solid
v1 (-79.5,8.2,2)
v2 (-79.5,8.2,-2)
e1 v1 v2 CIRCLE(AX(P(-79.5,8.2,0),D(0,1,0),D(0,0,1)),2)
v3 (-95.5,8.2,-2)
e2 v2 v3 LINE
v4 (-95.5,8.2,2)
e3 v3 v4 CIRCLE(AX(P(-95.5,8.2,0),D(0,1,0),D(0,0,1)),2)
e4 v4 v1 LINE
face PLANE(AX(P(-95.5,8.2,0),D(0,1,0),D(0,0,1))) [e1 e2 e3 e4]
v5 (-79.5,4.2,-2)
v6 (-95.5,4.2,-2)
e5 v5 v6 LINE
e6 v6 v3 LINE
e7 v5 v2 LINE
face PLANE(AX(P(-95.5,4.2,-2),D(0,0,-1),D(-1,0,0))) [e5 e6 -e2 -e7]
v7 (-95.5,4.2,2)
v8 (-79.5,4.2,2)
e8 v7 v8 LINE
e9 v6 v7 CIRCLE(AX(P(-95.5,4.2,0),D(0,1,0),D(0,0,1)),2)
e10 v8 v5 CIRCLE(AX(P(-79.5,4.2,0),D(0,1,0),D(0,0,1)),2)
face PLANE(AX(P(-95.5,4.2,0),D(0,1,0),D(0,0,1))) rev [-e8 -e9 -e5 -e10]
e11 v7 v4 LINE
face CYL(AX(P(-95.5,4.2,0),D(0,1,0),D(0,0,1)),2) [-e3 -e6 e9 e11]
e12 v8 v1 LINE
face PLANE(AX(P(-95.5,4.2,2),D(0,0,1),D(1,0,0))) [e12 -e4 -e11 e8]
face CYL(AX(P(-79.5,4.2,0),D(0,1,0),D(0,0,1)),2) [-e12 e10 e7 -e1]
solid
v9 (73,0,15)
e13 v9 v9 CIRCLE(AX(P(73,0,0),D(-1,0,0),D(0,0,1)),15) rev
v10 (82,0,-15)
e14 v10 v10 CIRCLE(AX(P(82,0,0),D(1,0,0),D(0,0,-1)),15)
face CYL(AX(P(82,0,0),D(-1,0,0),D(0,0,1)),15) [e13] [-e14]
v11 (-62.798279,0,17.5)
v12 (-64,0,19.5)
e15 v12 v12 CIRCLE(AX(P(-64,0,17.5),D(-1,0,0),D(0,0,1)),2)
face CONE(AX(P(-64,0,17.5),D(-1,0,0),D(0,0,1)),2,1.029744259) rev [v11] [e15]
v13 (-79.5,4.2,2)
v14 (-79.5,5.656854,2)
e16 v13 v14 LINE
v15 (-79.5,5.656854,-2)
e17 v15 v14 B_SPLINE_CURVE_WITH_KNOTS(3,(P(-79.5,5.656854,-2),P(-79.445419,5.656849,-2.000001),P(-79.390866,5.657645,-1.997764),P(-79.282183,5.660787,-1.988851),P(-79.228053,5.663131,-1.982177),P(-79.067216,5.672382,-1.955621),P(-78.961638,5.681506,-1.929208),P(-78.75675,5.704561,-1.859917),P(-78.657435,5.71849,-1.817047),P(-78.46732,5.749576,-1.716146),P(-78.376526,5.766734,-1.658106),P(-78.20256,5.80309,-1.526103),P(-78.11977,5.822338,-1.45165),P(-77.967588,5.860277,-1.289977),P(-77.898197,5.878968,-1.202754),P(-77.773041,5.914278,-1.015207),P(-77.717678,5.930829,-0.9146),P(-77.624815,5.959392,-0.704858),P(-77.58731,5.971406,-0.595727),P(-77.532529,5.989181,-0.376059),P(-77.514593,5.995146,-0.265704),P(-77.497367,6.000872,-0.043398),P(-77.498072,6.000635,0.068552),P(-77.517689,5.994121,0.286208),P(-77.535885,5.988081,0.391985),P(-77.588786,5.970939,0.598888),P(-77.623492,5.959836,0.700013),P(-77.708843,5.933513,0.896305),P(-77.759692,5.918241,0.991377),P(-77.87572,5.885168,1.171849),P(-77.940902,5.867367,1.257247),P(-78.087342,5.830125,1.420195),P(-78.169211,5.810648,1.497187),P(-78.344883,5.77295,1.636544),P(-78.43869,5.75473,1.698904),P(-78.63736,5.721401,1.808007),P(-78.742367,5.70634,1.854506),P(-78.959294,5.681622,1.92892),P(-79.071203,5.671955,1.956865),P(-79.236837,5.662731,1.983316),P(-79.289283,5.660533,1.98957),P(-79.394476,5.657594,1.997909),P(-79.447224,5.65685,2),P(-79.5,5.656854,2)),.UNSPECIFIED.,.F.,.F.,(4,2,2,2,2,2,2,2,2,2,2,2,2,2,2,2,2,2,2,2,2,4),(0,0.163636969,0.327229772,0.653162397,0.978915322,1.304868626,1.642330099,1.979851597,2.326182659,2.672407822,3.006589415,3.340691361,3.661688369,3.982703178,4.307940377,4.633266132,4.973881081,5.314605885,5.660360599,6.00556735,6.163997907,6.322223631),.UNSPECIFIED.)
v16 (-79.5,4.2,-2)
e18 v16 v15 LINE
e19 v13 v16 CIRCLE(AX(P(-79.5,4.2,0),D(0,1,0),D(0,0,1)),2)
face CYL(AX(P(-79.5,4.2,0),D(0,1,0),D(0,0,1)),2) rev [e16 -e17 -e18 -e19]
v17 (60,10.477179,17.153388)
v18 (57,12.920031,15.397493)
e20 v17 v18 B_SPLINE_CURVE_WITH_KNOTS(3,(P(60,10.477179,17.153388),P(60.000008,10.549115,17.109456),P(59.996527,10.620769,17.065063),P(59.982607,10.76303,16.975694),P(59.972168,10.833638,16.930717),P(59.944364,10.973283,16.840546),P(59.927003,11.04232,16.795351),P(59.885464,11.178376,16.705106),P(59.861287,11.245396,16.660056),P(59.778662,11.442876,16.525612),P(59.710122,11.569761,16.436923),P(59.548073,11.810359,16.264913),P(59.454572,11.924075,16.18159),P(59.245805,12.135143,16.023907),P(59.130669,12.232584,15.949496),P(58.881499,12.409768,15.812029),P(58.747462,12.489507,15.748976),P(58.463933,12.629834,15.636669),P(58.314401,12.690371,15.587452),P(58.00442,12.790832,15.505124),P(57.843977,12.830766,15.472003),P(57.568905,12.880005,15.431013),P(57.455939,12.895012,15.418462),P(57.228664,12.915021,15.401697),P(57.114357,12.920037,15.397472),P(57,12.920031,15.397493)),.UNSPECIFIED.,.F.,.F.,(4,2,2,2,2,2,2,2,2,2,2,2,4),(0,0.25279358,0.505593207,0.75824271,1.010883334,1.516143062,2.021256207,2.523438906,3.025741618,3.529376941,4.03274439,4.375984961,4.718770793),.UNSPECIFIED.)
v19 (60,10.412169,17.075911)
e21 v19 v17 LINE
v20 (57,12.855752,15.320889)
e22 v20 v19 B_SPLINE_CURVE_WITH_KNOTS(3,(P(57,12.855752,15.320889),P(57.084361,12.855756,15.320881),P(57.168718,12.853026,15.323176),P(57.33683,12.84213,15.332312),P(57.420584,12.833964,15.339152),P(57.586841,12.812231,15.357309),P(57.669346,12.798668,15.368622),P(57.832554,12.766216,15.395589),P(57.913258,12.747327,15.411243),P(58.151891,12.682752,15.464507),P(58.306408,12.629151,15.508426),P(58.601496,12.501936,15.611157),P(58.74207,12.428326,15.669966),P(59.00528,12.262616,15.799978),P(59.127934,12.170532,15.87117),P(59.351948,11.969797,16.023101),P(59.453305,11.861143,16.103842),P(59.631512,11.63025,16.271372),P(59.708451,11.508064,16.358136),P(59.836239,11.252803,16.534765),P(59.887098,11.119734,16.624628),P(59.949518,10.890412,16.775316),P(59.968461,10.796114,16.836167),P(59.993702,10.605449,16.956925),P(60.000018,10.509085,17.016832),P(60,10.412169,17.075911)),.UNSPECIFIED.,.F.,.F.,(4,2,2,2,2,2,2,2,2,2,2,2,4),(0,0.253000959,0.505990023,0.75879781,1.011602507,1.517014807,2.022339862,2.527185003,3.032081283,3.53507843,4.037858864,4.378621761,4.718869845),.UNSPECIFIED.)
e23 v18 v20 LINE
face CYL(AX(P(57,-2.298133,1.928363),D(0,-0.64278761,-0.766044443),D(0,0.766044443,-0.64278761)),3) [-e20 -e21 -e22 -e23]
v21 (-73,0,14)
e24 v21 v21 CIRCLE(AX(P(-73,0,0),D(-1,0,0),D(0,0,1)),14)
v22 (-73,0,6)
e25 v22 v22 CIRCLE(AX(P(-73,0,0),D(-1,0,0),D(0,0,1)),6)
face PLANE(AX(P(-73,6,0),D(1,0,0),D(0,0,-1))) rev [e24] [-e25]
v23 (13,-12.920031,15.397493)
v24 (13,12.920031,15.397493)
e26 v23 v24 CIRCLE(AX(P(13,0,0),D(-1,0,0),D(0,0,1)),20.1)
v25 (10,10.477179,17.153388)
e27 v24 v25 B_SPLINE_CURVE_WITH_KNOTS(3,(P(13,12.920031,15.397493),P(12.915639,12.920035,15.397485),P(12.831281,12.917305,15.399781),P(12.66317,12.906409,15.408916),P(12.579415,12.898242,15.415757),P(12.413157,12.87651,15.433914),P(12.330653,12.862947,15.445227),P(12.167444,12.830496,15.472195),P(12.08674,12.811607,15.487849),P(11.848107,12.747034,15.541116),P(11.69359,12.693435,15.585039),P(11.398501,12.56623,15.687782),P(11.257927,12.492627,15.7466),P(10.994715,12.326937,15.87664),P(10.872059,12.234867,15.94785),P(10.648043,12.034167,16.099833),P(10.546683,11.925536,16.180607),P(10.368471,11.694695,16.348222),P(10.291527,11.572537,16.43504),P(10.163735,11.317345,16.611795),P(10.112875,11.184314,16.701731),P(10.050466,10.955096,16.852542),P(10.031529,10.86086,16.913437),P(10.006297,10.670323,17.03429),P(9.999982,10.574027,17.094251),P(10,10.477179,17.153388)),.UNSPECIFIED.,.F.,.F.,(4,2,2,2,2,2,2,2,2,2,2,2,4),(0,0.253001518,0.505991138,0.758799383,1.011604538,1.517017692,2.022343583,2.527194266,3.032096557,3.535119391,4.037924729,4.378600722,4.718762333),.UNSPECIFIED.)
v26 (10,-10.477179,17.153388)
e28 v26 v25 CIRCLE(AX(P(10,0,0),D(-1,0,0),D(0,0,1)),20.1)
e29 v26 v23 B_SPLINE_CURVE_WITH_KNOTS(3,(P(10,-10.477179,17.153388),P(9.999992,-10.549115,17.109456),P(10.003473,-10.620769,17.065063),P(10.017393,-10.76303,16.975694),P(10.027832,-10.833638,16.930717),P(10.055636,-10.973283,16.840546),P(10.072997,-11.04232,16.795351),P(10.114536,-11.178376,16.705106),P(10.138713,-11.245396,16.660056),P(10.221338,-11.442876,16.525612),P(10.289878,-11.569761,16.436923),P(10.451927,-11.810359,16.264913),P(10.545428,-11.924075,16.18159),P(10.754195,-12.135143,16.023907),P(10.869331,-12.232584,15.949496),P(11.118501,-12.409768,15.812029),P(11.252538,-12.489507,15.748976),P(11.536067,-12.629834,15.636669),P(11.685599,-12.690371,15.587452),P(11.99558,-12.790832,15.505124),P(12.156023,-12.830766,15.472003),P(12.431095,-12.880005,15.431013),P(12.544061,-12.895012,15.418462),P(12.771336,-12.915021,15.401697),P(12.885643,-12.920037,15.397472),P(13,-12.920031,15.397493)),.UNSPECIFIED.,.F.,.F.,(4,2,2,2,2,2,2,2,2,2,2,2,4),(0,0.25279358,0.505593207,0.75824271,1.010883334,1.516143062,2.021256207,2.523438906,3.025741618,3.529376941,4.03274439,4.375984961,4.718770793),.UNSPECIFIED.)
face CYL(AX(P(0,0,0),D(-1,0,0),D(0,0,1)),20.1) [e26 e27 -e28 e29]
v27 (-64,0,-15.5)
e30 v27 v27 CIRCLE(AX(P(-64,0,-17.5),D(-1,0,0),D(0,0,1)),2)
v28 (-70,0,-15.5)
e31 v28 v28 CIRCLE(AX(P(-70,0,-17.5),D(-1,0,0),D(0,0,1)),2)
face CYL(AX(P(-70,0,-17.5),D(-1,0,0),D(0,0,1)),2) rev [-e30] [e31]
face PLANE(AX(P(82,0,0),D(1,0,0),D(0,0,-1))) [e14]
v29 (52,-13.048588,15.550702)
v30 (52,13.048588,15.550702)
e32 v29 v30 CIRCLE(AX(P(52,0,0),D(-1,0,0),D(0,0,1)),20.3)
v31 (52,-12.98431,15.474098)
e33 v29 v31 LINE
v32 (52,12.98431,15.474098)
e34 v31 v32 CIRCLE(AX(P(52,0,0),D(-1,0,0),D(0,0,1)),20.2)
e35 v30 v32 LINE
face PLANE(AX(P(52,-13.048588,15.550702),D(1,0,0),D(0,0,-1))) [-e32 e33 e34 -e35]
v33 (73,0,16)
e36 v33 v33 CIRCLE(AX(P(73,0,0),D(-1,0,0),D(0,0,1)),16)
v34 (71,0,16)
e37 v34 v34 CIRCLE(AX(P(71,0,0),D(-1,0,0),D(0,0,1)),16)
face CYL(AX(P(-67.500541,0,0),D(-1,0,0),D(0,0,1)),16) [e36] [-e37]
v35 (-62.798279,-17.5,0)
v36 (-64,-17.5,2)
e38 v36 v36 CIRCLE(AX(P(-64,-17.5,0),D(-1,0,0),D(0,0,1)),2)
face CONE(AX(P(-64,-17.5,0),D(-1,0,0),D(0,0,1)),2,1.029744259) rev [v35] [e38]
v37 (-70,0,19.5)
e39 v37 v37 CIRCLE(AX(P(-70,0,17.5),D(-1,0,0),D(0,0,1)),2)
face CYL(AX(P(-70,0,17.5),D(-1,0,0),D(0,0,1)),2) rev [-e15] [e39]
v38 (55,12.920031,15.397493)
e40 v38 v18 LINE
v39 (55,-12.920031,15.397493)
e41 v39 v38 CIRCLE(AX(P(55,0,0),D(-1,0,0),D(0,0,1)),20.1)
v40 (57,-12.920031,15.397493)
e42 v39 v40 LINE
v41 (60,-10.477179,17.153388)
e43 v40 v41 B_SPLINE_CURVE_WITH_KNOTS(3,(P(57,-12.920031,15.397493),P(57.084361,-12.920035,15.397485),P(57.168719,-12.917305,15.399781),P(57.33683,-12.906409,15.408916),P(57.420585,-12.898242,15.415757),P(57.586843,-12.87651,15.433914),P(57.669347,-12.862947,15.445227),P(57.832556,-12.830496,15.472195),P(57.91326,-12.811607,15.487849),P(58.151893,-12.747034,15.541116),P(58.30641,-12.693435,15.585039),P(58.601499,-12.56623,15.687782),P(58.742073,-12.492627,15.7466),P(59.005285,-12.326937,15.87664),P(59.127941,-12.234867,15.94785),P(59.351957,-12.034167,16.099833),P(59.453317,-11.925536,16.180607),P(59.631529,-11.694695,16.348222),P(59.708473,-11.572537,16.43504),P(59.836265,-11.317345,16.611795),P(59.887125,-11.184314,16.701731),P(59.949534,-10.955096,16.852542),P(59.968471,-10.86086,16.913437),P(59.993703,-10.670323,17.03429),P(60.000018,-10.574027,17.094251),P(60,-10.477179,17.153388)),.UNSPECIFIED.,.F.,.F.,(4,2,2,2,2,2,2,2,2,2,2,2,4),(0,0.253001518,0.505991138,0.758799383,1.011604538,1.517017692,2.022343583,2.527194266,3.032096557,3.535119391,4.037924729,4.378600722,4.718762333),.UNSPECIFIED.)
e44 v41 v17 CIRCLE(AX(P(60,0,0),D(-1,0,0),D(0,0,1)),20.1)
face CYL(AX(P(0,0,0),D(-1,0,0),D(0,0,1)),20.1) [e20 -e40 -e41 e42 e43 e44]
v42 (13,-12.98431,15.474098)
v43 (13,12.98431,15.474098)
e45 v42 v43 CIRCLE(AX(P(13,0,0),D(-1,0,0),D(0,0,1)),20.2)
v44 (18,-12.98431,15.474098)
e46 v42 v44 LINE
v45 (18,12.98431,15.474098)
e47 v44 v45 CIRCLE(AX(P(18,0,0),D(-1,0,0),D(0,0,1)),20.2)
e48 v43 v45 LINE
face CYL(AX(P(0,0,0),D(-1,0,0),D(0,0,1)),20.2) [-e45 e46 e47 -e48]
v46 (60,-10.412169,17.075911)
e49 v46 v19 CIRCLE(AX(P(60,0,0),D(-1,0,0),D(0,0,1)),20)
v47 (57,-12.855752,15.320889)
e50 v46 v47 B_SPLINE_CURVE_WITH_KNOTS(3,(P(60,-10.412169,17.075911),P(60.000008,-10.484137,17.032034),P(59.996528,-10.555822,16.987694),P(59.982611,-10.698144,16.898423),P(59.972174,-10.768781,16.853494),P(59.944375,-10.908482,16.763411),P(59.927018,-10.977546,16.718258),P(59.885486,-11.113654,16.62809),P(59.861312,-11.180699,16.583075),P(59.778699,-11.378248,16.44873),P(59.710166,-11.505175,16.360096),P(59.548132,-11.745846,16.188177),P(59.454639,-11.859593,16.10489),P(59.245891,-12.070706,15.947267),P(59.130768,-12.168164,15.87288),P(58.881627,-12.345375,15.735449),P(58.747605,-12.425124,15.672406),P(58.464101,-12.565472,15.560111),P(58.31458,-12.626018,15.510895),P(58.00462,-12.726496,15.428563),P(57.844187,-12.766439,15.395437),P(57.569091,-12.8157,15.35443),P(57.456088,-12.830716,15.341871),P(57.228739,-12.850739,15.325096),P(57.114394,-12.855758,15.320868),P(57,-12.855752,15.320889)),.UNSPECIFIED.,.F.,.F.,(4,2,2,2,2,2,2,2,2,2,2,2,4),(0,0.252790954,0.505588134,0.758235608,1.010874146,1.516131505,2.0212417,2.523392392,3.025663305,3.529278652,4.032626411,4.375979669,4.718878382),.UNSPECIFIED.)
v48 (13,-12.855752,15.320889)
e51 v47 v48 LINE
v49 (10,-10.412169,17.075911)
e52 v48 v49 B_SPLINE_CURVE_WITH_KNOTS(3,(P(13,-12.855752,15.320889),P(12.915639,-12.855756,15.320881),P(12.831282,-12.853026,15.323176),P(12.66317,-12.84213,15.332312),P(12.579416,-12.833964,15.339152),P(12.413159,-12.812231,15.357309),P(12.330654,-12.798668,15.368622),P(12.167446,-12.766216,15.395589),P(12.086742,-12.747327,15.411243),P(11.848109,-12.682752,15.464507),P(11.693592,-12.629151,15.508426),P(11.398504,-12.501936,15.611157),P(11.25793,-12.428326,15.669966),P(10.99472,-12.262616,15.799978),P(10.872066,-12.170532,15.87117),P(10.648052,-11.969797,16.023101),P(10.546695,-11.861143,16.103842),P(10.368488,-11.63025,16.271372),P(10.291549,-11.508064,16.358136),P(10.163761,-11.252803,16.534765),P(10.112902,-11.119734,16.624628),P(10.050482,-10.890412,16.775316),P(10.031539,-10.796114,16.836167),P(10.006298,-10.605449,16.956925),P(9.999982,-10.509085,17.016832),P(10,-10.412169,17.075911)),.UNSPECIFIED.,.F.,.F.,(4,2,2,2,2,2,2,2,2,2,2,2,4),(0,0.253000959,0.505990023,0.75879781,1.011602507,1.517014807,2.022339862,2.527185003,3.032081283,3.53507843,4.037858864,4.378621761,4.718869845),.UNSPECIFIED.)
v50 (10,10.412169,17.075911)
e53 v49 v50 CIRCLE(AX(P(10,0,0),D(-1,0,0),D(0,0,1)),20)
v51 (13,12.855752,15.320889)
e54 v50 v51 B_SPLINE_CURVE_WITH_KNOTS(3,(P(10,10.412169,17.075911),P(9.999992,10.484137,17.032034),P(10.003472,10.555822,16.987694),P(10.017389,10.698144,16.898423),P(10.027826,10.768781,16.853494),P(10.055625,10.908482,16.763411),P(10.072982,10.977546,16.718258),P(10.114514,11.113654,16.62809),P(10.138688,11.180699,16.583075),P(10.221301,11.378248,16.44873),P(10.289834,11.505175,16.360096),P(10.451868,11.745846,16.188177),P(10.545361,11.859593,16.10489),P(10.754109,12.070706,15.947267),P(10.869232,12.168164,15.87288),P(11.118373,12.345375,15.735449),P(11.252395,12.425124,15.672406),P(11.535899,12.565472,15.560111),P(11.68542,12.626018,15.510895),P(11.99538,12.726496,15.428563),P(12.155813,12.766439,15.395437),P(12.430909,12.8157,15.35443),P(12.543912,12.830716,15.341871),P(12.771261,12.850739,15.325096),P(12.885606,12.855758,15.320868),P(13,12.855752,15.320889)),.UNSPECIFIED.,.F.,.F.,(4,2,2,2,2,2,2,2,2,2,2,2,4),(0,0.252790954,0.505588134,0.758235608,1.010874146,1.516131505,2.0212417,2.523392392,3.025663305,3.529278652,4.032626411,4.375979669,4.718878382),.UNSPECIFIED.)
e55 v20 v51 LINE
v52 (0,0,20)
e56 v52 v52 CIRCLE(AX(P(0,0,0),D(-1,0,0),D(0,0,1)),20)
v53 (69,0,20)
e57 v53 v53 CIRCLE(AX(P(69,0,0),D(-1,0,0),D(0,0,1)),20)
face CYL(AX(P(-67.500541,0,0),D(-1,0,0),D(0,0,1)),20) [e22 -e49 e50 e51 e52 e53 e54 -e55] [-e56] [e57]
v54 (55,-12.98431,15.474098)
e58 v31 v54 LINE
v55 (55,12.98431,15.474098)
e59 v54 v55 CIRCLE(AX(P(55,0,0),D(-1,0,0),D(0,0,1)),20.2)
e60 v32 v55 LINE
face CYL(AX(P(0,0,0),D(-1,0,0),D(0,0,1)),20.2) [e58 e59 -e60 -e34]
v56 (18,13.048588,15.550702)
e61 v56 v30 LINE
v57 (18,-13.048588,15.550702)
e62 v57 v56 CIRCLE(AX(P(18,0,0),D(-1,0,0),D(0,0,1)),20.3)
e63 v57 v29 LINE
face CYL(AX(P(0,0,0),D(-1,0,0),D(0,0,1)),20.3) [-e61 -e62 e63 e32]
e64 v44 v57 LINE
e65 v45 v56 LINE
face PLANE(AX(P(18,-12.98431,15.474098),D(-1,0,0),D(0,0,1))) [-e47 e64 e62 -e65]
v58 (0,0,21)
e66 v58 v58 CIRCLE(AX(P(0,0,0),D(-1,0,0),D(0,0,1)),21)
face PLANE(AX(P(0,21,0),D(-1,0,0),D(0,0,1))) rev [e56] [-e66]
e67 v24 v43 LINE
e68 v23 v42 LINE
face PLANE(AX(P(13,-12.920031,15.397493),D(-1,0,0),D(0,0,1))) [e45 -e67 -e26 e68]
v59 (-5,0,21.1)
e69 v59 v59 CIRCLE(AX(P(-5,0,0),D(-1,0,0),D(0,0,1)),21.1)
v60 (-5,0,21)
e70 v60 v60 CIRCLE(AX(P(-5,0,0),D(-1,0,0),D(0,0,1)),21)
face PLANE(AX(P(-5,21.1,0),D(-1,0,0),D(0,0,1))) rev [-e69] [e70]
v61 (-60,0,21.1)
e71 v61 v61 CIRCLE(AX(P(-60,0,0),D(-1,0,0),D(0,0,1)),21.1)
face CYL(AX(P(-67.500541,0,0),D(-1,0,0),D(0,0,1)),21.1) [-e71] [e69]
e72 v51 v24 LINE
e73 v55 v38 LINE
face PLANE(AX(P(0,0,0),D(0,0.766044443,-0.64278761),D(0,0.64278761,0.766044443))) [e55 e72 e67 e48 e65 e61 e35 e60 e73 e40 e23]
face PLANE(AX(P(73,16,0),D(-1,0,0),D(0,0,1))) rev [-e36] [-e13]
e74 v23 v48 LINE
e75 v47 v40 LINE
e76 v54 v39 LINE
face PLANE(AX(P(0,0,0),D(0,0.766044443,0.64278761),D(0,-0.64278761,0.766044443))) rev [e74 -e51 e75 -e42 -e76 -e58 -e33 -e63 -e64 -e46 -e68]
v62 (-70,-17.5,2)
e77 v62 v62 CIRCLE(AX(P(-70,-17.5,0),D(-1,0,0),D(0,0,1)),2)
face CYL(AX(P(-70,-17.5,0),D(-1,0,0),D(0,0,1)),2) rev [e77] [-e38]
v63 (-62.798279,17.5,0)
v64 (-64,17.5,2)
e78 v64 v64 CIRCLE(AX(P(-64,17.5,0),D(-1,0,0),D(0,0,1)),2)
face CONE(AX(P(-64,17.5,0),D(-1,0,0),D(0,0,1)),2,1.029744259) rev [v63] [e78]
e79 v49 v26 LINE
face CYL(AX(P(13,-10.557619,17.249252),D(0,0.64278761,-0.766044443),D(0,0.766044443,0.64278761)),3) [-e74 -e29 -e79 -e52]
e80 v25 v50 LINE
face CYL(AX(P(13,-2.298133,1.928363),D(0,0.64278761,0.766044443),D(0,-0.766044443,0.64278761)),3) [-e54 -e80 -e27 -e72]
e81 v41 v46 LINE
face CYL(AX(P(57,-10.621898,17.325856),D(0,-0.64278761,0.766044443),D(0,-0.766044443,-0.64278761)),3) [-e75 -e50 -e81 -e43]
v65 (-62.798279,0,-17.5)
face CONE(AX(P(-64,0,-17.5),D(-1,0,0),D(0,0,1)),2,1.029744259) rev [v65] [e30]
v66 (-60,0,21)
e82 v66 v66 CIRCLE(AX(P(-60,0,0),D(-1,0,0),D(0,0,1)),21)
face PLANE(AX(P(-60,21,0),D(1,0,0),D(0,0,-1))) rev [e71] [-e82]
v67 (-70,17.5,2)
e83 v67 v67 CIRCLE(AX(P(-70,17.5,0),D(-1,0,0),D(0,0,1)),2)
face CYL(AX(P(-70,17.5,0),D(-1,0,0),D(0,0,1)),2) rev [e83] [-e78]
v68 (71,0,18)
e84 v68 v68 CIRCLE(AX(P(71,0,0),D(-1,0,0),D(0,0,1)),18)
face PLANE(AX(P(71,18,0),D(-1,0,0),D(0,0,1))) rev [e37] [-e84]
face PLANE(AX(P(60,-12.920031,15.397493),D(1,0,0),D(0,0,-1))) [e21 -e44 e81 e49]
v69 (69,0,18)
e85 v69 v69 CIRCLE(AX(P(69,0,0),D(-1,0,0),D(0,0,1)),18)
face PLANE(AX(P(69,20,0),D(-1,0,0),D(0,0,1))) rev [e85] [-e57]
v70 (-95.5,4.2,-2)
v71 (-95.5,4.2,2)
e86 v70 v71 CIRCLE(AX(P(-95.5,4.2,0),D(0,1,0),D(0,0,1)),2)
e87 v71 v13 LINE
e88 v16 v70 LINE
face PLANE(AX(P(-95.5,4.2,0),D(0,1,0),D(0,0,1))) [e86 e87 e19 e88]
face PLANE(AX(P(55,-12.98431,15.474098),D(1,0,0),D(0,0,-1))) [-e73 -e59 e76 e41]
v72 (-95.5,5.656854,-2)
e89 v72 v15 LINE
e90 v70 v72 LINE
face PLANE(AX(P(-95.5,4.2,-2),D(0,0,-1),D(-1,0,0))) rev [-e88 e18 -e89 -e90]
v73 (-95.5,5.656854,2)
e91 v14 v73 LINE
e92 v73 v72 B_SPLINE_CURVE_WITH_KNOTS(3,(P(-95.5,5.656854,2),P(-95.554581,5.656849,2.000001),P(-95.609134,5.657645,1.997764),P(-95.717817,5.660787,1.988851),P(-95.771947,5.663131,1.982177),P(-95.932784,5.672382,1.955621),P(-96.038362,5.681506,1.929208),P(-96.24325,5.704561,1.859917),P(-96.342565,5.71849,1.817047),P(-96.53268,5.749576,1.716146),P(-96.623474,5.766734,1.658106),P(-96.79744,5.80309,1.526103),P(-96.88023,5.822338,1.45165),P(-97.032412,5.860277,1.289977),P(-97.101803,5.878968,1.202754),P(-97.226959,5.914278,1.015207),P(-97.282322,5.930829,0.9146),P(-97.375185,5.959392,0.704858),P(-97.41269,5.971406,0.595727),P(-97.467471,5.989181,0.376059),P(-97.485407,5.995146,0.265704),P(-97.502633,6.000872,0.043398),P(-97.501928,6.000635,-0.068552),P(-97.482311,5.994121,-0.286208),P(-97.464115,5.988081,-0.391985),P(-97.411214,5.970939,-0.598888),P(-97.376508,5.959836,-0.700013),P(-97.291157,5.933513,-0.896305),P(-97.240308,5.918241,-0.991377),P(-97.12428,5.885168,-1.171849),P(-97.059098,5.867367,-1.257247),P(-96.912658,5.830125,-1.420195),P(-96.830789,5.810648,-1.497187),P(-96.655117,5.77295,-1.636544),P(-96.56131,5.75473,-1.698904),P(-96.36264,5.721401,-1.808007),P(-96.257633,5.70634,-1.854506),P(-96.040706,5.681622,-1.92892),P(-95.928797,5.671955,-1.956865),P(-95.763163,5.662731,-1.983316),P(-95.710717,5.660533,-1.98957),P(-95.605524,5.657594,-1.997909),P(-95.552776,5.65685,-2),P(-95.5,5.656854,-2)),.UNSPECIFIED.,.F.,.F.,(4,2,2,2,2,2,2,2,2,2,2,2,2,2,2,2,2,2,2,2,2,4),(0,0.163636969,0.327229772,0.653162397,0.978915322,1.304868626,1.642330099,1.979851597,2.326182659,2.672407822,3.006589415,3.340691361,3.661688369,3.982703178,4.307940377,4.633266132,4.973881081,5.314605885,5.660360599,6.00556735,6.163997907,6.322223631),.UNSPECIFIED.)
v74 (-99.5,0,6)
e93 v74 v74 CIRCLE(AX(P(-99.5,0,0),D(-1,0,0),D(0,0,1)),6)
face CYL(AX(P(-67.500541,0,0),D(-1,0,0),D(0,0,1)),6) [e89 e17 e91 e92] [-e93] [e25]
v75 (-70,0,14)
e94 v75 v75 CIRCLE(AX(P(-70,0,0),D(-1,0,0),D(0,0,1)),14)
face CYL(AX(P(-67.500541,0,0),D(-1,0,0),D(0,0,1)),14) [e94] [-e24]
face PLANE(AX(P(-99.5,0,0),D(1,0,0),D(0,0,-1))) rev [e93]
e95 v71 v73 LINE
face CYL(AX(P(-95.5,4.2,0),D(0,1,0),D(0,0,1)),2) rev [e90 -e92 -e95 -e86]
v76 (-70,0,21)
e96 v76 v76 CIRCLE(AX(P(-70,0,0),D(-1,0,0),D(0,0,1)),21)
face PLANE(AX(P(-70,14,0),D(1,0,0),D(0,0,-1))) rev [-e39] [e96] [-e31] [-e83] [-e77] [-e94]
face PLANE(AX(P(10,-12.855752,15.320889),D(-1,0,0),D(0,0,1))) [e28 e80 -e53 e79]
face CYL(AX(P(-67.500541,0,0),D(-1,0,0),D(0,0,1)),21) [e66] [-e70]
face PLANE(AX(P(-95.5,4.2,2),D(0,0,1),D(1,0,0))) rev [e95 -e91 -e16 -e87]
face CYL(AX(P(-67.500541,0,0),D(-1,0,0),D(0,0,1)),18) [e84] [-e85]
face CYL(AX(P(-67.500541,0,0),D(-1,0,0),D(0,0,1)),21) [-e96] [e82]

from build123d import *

# Parameters (mm, degrees)
SKETCH_2_R                     = 15
EXTRUDE_1_DEPTH                = 9
CUT_EXTRUDE_START              = 6
CUT_EXTRUDE_1_DEPTH            = 1.8
EXTRUDE_3_DEPTH                = 2.2
EXTRUDE_3_DEPTH_BACK           = 1.8
EXTRUDE_3_START                = 6
REVOLVE_2_ANGLE                = 40
REVOLVE_2_OTHER_WAY_ANGLE      = 40
FILLET_1_R                     = 3
HOLE_WIZARD_4_0_4_1_AT_2_COUNT = 2
HOLE_WIZARD_4_0_4_1_AT_2_PITCH = 24.748737342
HOLE_WIZARD_4_0_4_1_AT_3_COUNT = 2
HOLE_WIZARD_4_0_4_1_AT_3_PITCH = 35
HOLE_WIZARD_4_0_4_1_AT_4_COUNT = 2
HOLE_WIZARD_4_0_4_1_AT_4_PITCH = 24.748737342


with BuildPart() as part:
    # ｽｹｯﾁ1 → 回転1 (revolve)
    with BuildSketch(Plane.XY, mode=Mode.PRIVATE) as revolve_1_sk:
        Polygon((-99.5, 0), (-99.5, 6), (-73, 6), (-73, 14), (-70, 14), (-70, 21), (-60, 21), (-60, 21.1), (-5, 21.1), (-5, 21), (0, 21), (0, 20), (69, 20), (69, 18), (71, 18), (71, 16), (73, 16), (73, 0), align=None)
    revolve(revolve_1_sk.sketch.rotate(Axis((-67.500540801, 0, 0), (1, 0, 0)), 90), axis=Axis((-67.500540801, 0, 0), (1, 0, 0)))

    # ｽｹｯﾁ2 → ﾎﾞｽ - 押し出し1 (add)
    with BuildSketch(Plane(origin=(73, 0, 0), x_dir=(0, 0, -1), z_dir=(1, 0, 0))):
        with Locations(Location((0, 0, 0), (0, 0, 180))):
            Circle(SKETCH_2_R)
    extrude(amount=EXTRUDE_1_DEPTH)

    # ｽｹｯﾁ3 → ｶｯﾄ - 押し出し1 (cut)
    with BuildSketch(Plane(origin=(0, 0, 0), x_dir=(1, 0, 0), z_dir=(0, 1, 0)).offset(CUT_EXTRUDE_START)):
        with BuildLine():
            Line((-95.5, 2), (-79.5, 2))
            ThreePointArc((-79.5, 2), (-77.5, 0), (-79.5, -2))
            Line((-79.5, -2), (-95.5, -2))
            ThreePointArc((-95.5, -2), (-97.5, 0), (-95.5, 2))
        make_face()
    extrude(amount=-CUT_EXTRUDE_1_DEPTH, mode=Mode.SUBTRACT)

    # ｽｹｯﾁ7 → 回転2 (revolve)
    with BuildSketch(Plane(origin=(0, 0, 0), x_dir=(1, 0, 0), z_dir=(0, 1, 0))):
        Polygon((10, -20), (10, -20.1), (13, -20.1), (13, -20.2), (18, -20.2), (18, -20.3), (52, -20.3), (52, -20.2), (55, -20.2), (55, -20.1), (60, -20.1), (60, -20), align=None)
    revolve(axis=Axis((0, 0, 0), (1, 0, 0)), revolution_arc=REVOLVE_2_ANGLE)

    # ｽｹｯﾁ7 → 回転2 other way (revolve)
    with BuildSketch(Plane(origin=(0, 0, 0), x_dir=(1, 0, 0), z_dir=(0, 1, 0))):
        Polygon((10, -20), (10, -20.1), (13, -20.1), (13, -20.2), (18, -20.2), (18, -20.3), (52, -20.3), (52, -20.2), (55, -20.2), (55, -20.1), (60, -20.1), (60, -20), align=None)
    revolve(axis=Axis((0, 0, 0), (-1, 0, 0)), revolution_arc=REVOLVE_2_OTHER_WAY_ANGLE)

    # ﾌｨﾚｯﾄ1
    # the kernel refuses this fillet: 3 mm, written as the material it takes off along each edge
    with BuildSketch(Plane(origin=(10, -8.034845121, 9.575555539), x_dir=(1, 0, 0), z_dir=(-1.7763568394002255e-14, -0.6427876096865406, 0.7660444431189771))) as fillet_1_piece_1_section:
        with BuildLine():
            CenterArc((FILLET_1_R, FILLET_1_R), FILLET_1_R, 180, 90)
            Line((0, FILLET_1_R), (0, 0))
            Line((0, 0), (FILLET_1_R, 0))
        make_face()
    fillet_1_piece_1 = extrude(amount=15.1, mode=Mode.PRIVATE)
    fillet_1_piece_1 = fillet_1_piece_1 - Plane(origin=(10.677750836, 0, 0), x_dir=(0, 0, 1), z_dir=(1, 0, 0)) * Cylinder(20, 43, mode=Mode.PRIVATE)
    add(fillet_1_piece_1, mode=Mode.SUBTRACT)
    with BuildSketch(Plane(origin=(60, -17.740938027, 21.14282663), x_dir=(0, 0.766044443118977, 0.6427876096865406), z_dir=(-7.105427357601155e-14, 0.6427876096865406, -0.7660444431189771))) as fillet_1_piece_2_section:
        with BuildLine():
            CenterArc((FILLET_1_R, -FILLET_1_R), FILLET_1_R, 90, 90)
            Line((0, -FILLET_1_R), (0, 0))
            Line((0, 0), (FILLET_1_R, 0))
        make_face()
    fillet_1_piece_2 = extrude(amount=15.1, mode=Mode.PRIVATE)
    fillet_1_piece_2 = fillet_1_piece_2 - Plane(origin=(59.322254473, 0, 0), x_dir=(0, 0, 1), z_dir=(1, 0, 0)) * Cylinder(20, 43, mode=Mode.PRIVATE)
    add(fillet_1_piece_2, mode=Mode.SUBTRACT)
    with BuildSketch(Plane(origin=(10, 8.034845121, 9.575555539), x_dir=(1, 0, 0), z_dir=(-1.7763568394002255e-14, 0.6427876096865406, 0.7660444431189771))) as fillet_1_piece_3_section:
        with BuildLine():
            CenterArc((FILLET_1_R, -FILLET_1_R), FILLET_1_R, 90, 90)
            Line((0, -FILLET_1_R), (0, 0))
            Line((0, 0), (FILLET_1_R, 0))
        make_face()
    fillet_1_piece_3 = extrude(amount=15.1, mode=Mode.PRIVATE)
    fillet_1_piece_3 = fillet_1_piece_3 - Plane(origin=(10.677751865, 0, 0), x_dir=(0, 0, 1), z_dir=(1, 0, 0)) * Cylinder(20, 43, mode=Mode.PRIVATE)
    add(fillet_1_piece_3, mode=Mode.SUBTRACT)
    with BuildSketch(Plane(origin=(60, 17.740938027, 21.14282663), x_dir=(-1, 0, 0), z_dir=(-7.105427357601155e-14, -0.6427876096865406, -0.7660444431189771))) as fillet_1_piece_4_section:
        with BuildLine():
            CenterArc((FILLET_1_R, -FILLET_1_R), FILLET_1_R, 90, 90)
            Line((0, -FILLET_1_R), (0, 0))
            Line((0, 0), (FILLET_1_R, 0))
        make_face()
    fillet_1_piece_4 = extrude(amount=15.1, mode=Mode.PRIVATE)
    fillet_1_piece_4 = fillet_1_piece_4 - Plane(origin=(59.322248135, 0, 0), x_dir=(0, 0, 1), z_dir=(1, 0, 0)) * Cylinder(20, 43, mode=Mode.PRIVATE)
    add(fillet_1_piece_4, mode=Mode.SUBTRACT)

    # ｽｹｯﾁ9 → Ø4.0 (4) 直径の穴1 (revolve, cut)
    with BuildSketch(Plane(origin=(-70, 17.5, 0), x_dir=(0, 0, 1), z_dir=(0, 1, 0))):
        Polygon((0, 0), (0, 7.201721238), (2, 6), (2, 0), align=None)
    hole_wizard_4_0_4_1 = revolve(axis=Axis((-76.35, 17.5, 0), (1, 0, 0)), mode=Mode.SUBTRACT)

    # Ø4.0 (4) 直径の穴1 at 2: Ø4.0 (4) 直径の穴1 ×2
    with Locations(*[Vector(0, -0.7071067811865476, -0.7071067811865476) * (i * HOLE_WIZARD_4_0_4_1_AT_2_PITCH) for i in range(1, HOLE_WIZARD_4_0_4_1_AT_2_COUNT)]):
        add(hole_wizard_4_0_4_1, mode=Mode.SUBTRACT)

    # Ø4.0 (4) 直径の穴1 at 3: Ø4.0 (4) 直径の穴1 ×2
    with Locations(*[(0, -i * HOLE_WIZARD_4_0_4_1_AT_3_PITCH, 0) for i in range(1, HOLE_WIZARD_4_0_4_1_AT_3_COUNT)]):
        add(hole_wizard_4_0_4_1, mode=Mode.SUBTRACT)

    # Ø4.0 (4) 直径の穴1 at 4: Ø4.0 (4) 直径の穴1 ×2
    with Locations(*[Vector(0, -0.7071067811865476, 0.7071067811865476) * (i * HOLE_WIZARD_4_0_4_1_AT_4_PITCH) for i in range(1, HOLE_WIZARD_4_0_4_1_AT_4_COUNT)]):
        add(hole_wizard_4_0_4_1, mode=Mode.SUBTRACT)


with BuildPart() as body_2:
    # ｽｹｯﾁ3<2> → ﾎﾞｽ - 押し出し3 (new, two sides: drawn at the far end of the back side and taken through both)
    with BuildSketch(Plane(origin=(0, 0, 0), x_dir=(1, 0, 0), z_dir=(0, 1, 0)).offset(EXTRUDE_3_START - EXTRUDE_3_DEPTH_BACK)):
        with BuildLine():
            Line((-95.5, 2), (-79.5, 2))
            ThreePointArc((-79.5, 2), (-77.5, 0), (-79.5, -2))
            Line((-79.5, -2), (-95.5, -2))
            ThreePointArc((-95.5, -2), (-97.5, 0), (-95.5, 2))
        make_face()
    extrude(amount=EXTRUDE_3_DEPTH + EXTRUDE_3_DEPTH_BACK)


solid = Compound([part.part, body_2.part])
